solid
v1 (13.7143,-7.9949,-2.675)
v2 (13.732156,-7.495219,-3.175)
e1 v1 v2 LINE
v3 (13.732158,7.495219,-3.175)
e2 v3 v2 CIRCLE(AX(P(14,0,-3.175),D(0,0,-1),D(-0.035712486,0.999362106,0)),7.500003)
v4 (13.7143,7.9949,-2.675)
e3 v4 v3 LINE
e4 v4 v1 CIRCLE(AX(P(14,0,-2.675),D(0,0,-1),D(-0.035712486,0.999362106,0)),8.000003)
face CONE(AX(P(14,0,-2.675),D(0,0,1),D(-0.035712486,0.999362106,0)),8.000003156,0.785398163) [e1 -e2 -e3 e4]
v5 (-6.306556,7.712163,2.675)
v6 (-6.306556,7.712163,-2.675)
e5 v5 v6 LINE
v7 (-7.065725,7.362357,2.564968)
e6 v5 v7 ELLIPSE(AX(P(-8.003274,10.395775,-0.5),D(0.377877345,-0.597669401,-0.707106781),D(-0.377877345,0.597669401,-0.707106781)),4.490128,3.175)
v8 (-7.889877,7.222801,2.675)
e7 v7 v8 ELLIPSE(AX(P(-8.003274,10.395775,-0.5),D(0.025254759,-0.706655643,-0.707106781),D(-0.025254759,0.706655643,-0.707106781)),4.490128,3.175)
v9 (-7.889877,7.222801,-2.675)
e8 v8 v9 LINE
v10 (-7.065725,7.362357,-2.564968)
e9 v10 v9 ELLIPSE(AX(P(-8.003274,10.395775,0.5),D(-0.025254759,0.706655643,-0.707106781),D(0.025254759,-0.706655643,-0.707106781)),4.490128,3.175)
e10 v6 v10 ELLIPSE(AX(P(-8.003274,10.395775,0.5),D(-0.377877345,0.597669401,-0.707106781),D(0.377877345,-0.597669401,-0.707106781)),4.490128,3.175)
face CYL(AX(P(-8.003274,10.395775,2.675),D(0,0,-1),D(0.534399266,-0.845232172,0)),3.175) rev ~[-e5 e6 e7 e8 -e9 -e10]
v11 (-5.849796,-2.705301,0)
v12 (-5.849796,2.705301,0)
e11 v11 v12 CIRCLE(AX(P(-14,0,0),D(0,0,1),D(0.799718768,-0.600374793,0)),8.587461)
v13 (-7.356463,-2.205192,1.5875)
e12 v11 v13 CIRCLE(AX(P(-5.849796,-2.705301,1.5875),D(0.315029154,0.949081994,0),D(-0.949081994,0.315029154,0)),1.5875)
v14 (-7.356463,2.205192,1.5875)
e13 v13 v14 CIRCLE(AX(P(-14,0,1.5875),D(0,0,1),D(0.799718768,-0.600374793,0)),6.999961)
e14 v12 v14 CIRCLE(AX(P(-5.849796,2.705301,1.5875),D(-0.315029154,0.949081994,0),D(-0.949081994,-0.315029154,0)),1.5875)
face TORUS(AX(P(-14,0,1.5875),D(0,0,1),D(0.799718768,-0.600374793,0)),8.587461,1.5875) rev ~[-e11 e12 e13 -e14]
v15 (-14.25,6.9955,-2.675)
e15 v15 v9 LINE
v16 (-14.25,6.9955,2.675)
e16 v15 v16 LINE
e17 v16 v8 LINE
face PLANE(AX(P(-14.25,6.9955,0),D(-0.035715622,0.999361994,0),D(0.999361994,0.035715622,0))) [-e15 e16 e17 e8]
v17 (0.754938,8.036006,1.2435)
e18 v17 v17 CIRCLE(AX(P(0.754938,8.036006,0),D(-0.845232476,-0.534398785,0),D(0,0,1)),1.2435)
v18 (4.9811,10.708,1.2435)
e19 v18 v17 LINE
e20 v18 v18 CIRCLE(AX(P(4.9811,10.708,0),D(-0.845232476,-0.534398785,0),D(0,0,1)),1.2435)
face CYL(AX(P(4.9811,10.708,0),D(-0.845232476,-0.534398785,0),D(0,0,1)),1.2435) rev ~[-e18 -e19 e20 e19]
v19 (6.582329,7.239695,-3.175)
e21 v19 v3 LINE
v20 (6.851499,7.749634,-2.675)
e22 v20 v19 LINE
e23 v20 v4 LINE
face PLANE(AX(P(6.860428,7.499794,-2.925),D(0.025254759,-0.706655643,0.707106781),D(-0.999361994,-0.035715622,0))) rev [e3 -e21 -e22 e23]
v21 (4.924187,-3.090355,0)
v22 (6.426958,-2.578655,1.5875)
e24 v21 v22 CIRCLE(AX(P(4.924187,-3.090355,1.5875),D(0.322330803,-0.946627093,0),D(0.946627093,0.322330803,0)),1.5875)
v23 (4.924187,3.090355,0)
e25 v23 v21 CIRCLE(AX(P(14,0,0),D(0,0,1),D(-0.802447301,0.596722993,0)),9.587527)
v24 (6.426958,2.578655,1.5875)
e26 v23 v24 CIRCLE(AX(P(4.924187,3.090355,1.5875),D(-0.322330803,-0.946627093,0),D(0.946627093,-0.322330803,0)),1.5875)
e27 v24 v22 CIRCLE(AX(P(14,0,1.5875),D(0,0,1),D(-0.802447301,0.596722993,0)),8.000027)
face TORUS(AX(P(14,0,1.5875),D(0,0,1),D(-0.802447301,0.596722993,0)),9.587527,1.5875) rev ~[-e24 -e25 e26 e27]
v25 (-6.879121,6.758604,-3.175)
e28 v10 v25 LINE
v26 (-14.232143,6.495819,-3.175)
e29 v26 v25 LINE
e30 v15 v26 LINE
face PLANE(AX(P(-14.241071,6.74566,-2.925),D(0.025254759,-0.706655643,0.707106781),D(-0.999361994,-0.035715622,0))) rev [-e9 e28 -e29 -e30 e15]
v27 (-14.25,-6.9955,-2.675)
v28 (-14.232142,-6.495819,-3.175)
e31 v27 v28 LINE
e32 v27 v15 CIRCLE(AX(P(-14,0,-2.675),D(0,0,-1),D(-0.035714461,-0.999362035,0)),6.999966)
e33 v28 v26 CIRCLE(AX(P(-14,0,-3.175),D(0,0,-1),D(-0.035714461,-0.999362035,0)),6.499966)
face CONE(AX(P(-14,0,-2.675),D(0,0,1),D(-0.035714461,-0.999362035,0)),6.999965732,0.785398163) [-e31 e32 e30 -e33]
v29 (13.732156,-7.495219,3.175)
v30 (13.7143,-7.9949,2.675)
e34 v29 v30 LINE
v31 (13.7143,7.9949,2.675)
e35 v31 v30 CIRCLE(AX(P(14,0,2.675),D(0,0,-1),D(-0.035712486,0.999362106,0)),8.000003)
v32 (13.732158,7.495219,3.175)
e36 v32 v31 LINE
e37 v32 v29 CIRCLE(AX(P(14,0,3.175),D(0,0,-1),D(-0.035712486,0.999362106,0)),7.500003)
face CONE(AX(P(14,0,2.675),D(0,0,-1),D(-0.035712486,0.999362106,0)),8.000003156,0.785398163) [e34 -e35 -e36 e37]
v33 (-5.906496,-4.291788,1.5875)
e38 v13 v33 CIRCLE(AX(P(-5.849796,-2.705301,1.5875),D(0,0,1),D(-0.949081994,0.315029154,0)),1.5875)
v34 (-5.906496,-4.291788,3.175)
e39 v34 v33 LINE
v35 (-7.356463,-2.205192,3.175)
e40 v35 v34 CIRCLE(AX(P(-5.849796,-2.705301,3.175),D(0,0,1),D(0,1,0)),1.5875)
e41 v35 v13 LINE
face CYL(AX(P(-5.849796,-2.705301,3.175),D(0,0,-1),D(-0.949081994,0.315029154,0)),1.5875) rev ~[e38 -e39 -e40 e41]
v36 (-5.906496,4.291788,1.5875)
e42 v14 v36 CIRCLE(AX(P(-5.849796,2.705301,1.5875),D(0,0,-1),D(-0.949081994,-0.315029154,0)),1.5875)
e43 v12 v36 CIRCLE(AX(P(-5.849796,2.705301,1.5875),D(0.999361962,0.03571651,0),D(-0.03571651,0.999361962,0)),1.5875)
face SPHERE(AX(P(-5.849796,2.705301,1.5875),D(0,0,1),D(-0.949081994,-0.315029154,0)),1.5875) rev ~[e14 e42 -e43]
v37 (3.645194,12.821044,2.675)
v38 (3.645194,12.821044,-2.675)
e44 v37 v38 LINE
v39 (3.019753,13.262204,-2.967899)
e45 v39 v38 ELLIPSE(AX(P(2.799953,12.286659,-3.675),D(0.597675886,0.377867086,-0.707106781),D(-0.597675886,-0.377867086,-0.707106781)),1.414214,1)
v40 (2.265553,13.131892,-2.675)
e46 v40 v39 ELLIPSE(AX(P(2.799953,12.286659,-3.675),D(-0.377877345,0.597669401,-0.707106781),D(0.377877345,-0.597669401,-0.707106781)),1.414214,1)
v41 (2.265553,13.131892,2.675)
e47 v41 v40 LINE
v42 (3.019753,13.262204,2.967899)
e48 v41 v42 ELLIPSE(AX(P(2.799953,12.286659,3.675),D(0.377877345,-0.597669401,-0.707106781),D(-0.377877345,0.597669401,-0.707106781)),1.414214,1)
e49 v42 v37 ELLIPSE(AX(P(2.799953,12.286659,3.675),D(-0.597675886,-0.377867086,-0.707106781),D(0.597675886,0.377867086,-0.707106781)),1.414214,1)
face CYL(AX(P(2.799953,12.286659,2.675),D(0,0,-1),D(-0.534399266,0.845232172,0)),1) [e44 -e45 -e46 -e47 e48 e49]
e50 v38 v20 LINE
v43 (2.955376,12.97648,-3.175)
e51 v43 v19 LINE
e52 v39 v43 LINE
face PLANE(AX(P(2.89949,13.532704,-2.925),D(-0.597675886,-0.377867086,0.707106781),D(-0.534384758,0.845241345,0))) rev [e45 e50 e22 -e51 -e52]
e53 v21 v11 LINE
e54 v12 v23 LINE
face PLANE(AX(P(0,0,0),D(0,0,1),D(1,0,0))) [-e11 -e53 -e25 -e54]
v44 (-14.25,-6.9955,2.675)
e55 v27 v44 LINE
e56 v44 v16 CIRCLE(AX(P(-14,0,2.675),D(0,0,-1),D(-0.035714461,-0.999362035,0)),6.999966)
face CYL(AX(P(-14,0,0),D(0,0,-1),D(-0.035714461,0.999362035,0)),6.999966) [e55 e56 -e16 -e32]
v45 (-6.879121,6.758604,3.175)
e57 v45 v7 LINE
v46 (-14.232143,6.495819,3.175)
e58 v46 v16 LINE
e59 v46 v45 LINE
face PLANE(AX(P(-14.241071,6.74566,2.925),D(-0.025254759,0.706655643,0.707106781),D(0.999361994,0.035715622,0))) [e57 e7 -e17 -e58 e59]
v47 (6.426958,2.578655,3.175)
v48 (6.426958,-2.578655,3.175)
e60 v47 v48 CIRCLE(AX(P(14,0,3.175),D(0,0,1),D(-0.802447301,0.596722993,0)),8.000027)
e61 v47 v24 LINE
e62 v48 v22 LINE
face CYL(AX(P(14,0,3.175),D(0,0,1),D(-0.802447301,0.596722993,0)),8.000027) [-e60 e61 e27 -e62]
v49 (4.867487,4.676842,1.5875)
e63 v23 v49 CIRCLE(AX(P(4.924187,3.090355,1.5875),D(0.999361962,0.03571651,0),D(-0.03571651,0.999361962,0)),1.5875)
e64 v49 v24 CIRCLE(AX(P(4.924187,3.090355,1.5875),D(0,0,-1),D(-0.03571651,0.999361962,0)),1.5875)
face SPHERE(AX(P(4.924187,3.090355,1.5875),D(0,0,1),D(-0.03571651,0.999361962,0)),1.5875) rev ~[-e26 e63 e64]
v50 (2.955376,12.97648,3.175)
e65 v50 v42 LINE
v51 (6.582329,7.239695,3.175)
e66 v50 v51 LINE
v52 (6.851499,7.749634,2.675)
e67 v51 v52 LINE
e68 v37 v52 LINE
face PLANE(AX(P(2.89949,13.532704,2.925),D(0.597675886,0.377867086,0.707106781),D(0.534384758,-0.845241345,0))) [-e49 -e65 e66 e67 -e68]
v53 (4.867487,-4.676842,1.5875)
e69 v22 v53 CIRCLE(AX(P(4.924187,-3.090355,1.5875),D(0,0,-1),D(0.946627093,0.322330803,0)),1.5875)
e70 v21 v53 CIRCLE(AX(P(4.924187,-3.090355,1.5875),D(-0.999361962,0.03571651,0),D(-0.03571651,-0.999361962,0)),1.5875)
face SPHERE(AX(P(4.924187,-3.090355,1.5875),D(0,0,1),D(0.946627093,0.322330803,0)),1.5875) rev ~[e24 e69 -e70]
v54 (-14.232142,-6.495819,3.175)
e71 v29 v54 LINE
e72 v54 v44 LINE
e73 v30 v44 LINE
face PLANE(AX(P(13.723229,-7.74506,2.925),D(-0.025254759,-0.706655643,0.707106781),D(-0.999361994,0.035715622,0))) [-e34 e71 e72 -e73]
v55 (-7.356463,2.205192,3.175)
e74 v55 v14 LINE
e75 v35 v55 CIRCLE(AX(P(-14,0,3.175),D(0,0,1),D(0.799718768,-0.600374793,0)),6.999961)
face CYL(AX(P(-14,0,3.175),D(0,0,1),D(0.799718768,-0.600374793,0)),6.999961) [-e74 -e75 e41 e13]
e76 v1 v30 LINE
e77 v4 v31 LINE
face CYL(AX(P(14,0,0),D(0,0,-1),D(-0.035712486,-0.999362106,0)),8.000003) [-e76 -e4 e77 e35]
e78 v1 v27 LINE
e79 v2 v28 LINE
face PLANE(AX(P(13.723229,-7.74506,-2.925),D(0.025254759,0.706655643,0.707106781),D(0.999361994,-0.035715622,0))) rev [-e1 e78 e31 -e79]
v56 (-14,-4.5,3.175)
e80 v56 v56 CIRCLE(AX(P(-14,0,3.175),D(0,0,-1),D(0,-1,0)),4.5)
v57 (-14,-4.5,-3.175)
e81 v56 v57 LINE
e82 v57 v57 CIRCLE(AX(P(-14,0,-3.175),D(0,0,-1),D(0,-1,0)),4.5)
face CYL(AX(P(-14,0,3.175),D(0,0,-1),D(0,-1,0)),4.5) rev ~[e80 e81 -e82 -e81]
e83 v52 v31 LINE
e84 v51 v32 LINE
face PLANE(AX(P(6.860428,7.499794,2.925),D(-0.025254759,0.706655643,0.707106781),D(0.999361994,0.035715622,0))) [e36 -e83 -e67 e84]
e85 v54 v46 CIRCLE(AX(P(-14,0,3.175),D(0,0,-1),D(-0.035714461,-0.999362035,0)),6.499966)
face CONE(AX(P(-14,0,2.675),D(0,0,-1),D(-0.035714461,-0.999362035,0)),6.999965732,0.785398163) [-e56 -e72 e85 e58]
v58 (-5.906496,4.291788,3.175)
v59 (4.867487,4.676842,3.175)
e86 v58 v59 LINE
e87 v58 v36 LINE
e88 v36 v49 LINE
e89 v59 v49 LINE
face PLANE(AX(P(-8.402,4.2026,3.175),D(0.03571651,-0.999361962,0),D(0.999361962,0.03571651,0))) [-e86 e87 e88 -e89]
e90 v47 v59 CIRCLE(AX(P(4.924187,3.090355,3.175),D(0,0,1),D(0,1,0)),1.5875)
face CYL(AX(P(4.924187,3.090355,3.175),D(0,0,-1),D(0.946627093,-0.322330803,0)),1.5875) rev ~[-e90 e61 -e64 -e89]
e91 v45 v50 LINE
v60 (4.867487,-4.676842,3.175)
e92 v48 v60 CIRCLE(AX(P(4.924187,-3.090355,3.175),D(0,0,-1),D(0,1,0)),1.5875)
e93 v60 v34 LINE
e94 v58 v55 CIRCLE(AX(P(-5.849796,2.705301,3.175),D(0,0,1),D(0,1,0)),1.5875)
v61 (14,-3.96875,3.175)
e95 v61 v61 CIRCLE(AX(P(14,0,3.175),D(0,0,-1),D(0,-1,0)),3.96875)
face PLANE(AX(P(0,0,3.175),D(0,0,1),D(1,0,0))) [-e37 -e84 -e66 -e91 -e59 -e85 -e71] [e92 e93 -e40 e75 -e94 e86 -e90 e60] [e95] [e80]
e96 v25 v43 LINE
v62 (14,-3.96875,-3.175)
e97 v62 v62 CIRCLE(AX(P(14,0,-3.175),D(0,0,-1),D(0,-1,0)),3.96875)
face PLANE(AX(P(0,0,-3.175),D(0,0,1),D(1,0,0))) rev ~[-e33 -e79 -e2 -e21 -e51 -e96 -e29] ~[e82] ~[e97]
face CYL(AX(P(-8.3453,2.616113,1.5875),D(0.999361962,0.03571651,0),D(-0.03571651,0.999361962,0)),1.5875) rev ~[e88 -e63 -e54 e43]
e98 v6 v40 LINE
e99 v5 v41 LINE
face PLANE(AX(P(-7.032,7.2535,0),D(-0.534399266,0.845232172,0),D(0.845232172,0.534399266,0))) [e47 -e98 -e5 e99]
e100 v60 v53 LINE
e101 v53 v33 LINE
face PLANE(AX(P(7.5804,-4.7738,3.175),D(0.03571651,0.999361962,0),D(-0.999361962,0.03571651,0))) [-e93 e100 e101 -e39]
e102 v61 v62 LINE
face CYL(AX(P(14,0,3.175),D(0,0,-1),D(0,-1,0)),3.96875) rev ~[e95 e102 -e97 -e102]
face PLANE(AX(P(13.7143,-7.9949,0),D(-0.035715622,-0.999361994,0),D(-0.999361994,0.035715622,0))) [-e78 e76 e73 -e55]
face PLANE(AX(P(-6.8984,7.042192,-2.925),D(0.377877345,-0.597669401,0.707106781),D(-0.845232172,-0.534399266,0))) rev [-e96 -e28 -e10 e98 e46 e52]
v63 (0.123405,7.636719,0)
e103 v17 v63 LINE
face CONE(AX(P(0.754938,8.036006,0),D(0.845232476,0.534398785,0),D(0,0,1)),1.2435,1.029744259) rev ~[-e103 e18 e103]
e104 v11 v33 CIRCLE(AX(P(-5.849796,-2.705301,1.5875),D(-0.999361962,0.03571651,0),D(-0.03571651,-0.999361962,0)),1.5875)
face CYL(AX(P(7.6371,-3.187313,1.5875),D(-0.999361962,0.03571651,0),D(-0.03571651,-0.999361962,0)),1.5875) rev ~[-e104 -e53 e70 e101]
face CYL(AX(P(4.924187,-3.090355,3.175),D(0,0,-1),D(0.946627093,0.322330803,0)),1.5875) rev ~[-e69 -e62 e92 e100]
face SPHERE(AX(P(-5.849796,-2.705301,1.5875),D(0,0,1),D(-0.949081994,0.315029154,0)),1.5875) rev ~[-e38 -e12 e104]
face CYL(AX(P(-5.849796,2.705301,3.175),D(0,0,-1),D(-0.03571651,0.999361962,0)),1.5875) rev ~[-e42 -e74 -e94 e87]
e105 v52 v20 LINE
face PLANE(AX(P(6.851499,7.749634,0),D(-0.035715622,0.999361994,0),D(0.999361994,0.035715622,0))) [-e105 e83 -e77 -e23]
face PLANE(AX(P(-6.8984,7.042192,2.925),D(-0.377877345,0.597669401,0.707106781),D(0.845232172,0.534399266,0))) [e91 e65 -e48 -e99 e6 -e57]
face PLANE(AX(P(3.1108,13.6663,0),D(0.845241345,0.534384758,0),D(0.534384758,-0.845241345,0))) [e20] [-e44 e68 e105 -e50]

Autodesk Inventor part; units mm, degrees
ref_plane "YZ Plane" through (0, 0, 0) normal (1, 0, 0) x (0, 1, 0)
ref_plane "XZ Plane" through (0, 0, 0) normal (0, 1, 0) x (-1, 0, 0)
ref_plane "XY Plane" through (0, 0, 0) normal (0, 0, 1) x (1, 0, 0)
sketch "Sketch1" plane through (0, 0, 0) normal (0, 0, 1) x (1, 0, 0)
  line L0 (-14, 0) -> (14, 0) construction
  line L1 (-14.25, 6.9955) -> (13.7143, 7.9949)
  line L2 (13.7143, -7.9949) -> (-14.25, -6.9955)
  arc A0 (-14.25, 6.9955) -> (-14.25, -6.9955) centre (-14, 0) ccw
  arc A1 (13.7143, -7.9949) -> (13.7143, 7.9949) centre (14, 0) ccw
  line L3 (-7.032, 7.2535) -> (3.1108, 13.6663)
  line L4 (3.1108, 13.6663) -> (6.8515, 7.7496)
  line L5 (4.9811, 10.708) -> (-0.0902, 7.5016) construction
  point P0 (0, 0)
  point P1 (0, 0)
  dimension "d0" = 8
  dimension "d1" = 7
  dimension "d2" = 28
  dimension "d3" = 12
  dimension "d4" = 7
  dimension "d5" = 3.5
  dimension "d6" = 14
extrude "Extrusion1" add sketch "Sketch1" along normal mid plane 6.35
hole "Hole1" at (14, 0, 3.175) direction (0, 0, -1) diameter 7.9375 end through all
hole "Hole2" at (-14, 0, 3.175) direction (0, 0, -1) diameter 9 end through all clearance for "Flat Head Machine Screw" size "M8" standard "Ansi Metric M Profile"
sketch "Sketch2" plane through (3.1108, 13.6663, 3.175) normal (0.8452325, 0.5343988, 0) x (0, 0, -1)
  point P0 (3.175, -9.8888)
sketch "Sketch3" plane through (3.1108, 13.6663, 3.175) normal (0.8452325, 0.5343988, 0) x (0, 0, -1)
  line L0 (0, -7) -> (0, 0) construction
  line L1 (0, -3.5) -> (6.35, -3.5) construction
  line L2 (6.35, 0) -> (6.35, -7) construction
  line L3 (6.35, 0) -> (0, 0) construction
  line L4 (3.175, 0) -> (3.175, -7) construction
  line L5 (6.35, -7) -> (0, -7) construction
  point P0 (3.175, -9.8888)
  point P1 (3.175, -3.5)
hole "Hole3" at (4.9811, 10.708, 0) direction (-0.8452325, -0.5343988, 0) diameter 2.487 depth 5 tip angle 118 thread size "5-40 UNC" class "2B" standard "ANSI Unified Screw Threads"
sketch "Sketch4" plane through (0, 0, 3.175) normal (0, 0, 1) x (1, 0, 0)
  circle A0 centre (-14, 0) radius 4.5 projected
  circle A1 centre (14, 0) radius 3.9687 projected
  line L0 (6.8515, 7.7496) -> (3.1108, 13.6663) projected
  line L1 (3.1108, 13.6663) -> (-7.032, 7.2535) projected
  line L2 (-7.032, 7.2535) -> (-14.25, 6.9955) projected
  arc A2 (-14.25, 6.9955) -> (-14.25, -6.9955) centre (-14, 0) ccw projected
  line L3 (-14.25, -6.9955) -> (13.7143, -7.9949) projected
  arc A3 (13.7143, -7.9949) -> (13.7143, 7.9949) centre (14, 0) ccw projected
  line L4 (13.7143, 7.9949) -> (6.8515, 7.7496) projected
  line L5 (7.5804, -4.7738) -> (-8.402, -4.2026)
  arc A4 (-8.402, -4.2026) -> (-8.402, 4.2026) centre (-14, 0) ccw
  arc A5 (7.5804, 4.7738) -> (7.5804, -4.7738) centre (14, 0) ccw
  line L6 (-8.402, 4.2026) -> (7.5804, 4.7738)
  point P0 (0, 0)
  dimension "d35" = 3
  dimension "d36" = 3
extrude "Extrusion2" cut sketch "Sketch4" against normal blind 3.175 contours L5 A4 L6 A5
fillet "Fillet1" radius 1.5875 8 edges at (6, 0, 0) (7.5804, 4.7738, 1.5875) (-0.4108, 4.4882, 0) (-8.402, 4.2026, 1.5875) (-7, 0, 0) (-0.4108, -4.4882, 0) (7.5804, -4.7738, 1.5875) (-8.402, -4.2026, 1.5875)
chamfer "Chamfer1" distance 0.5 angle 45 14 edges at (-1.9606, 10.4599, -3.175) (-1.9606, 10.4599, 3.175) (-10.641, 7.1245, -3.175) (-21, 0, -3.175) (-0.2679, -7.4952, -3.175) (22, 0, -3.175) (10.2829, 7.8723, -3.175) (-10.641, 7.1245, 3.175) (-21, 0, 3.175) (-0.2679, -7.4952, 3.175) (22, 0, 3.175) (10.2829, 7.8723, 3.175) (4.9811, 10.708, -3.175) (4.9811, 10.708, 3.175)
fillet "Fillet2" radius 1 1 edges at (3.1108, 13.6663, 0)
fillet "Fillet3" radius 3.175 1 edges at (-7.032, 7.2535, 0)
properties part number "INVENTOR WORKSHOP"
